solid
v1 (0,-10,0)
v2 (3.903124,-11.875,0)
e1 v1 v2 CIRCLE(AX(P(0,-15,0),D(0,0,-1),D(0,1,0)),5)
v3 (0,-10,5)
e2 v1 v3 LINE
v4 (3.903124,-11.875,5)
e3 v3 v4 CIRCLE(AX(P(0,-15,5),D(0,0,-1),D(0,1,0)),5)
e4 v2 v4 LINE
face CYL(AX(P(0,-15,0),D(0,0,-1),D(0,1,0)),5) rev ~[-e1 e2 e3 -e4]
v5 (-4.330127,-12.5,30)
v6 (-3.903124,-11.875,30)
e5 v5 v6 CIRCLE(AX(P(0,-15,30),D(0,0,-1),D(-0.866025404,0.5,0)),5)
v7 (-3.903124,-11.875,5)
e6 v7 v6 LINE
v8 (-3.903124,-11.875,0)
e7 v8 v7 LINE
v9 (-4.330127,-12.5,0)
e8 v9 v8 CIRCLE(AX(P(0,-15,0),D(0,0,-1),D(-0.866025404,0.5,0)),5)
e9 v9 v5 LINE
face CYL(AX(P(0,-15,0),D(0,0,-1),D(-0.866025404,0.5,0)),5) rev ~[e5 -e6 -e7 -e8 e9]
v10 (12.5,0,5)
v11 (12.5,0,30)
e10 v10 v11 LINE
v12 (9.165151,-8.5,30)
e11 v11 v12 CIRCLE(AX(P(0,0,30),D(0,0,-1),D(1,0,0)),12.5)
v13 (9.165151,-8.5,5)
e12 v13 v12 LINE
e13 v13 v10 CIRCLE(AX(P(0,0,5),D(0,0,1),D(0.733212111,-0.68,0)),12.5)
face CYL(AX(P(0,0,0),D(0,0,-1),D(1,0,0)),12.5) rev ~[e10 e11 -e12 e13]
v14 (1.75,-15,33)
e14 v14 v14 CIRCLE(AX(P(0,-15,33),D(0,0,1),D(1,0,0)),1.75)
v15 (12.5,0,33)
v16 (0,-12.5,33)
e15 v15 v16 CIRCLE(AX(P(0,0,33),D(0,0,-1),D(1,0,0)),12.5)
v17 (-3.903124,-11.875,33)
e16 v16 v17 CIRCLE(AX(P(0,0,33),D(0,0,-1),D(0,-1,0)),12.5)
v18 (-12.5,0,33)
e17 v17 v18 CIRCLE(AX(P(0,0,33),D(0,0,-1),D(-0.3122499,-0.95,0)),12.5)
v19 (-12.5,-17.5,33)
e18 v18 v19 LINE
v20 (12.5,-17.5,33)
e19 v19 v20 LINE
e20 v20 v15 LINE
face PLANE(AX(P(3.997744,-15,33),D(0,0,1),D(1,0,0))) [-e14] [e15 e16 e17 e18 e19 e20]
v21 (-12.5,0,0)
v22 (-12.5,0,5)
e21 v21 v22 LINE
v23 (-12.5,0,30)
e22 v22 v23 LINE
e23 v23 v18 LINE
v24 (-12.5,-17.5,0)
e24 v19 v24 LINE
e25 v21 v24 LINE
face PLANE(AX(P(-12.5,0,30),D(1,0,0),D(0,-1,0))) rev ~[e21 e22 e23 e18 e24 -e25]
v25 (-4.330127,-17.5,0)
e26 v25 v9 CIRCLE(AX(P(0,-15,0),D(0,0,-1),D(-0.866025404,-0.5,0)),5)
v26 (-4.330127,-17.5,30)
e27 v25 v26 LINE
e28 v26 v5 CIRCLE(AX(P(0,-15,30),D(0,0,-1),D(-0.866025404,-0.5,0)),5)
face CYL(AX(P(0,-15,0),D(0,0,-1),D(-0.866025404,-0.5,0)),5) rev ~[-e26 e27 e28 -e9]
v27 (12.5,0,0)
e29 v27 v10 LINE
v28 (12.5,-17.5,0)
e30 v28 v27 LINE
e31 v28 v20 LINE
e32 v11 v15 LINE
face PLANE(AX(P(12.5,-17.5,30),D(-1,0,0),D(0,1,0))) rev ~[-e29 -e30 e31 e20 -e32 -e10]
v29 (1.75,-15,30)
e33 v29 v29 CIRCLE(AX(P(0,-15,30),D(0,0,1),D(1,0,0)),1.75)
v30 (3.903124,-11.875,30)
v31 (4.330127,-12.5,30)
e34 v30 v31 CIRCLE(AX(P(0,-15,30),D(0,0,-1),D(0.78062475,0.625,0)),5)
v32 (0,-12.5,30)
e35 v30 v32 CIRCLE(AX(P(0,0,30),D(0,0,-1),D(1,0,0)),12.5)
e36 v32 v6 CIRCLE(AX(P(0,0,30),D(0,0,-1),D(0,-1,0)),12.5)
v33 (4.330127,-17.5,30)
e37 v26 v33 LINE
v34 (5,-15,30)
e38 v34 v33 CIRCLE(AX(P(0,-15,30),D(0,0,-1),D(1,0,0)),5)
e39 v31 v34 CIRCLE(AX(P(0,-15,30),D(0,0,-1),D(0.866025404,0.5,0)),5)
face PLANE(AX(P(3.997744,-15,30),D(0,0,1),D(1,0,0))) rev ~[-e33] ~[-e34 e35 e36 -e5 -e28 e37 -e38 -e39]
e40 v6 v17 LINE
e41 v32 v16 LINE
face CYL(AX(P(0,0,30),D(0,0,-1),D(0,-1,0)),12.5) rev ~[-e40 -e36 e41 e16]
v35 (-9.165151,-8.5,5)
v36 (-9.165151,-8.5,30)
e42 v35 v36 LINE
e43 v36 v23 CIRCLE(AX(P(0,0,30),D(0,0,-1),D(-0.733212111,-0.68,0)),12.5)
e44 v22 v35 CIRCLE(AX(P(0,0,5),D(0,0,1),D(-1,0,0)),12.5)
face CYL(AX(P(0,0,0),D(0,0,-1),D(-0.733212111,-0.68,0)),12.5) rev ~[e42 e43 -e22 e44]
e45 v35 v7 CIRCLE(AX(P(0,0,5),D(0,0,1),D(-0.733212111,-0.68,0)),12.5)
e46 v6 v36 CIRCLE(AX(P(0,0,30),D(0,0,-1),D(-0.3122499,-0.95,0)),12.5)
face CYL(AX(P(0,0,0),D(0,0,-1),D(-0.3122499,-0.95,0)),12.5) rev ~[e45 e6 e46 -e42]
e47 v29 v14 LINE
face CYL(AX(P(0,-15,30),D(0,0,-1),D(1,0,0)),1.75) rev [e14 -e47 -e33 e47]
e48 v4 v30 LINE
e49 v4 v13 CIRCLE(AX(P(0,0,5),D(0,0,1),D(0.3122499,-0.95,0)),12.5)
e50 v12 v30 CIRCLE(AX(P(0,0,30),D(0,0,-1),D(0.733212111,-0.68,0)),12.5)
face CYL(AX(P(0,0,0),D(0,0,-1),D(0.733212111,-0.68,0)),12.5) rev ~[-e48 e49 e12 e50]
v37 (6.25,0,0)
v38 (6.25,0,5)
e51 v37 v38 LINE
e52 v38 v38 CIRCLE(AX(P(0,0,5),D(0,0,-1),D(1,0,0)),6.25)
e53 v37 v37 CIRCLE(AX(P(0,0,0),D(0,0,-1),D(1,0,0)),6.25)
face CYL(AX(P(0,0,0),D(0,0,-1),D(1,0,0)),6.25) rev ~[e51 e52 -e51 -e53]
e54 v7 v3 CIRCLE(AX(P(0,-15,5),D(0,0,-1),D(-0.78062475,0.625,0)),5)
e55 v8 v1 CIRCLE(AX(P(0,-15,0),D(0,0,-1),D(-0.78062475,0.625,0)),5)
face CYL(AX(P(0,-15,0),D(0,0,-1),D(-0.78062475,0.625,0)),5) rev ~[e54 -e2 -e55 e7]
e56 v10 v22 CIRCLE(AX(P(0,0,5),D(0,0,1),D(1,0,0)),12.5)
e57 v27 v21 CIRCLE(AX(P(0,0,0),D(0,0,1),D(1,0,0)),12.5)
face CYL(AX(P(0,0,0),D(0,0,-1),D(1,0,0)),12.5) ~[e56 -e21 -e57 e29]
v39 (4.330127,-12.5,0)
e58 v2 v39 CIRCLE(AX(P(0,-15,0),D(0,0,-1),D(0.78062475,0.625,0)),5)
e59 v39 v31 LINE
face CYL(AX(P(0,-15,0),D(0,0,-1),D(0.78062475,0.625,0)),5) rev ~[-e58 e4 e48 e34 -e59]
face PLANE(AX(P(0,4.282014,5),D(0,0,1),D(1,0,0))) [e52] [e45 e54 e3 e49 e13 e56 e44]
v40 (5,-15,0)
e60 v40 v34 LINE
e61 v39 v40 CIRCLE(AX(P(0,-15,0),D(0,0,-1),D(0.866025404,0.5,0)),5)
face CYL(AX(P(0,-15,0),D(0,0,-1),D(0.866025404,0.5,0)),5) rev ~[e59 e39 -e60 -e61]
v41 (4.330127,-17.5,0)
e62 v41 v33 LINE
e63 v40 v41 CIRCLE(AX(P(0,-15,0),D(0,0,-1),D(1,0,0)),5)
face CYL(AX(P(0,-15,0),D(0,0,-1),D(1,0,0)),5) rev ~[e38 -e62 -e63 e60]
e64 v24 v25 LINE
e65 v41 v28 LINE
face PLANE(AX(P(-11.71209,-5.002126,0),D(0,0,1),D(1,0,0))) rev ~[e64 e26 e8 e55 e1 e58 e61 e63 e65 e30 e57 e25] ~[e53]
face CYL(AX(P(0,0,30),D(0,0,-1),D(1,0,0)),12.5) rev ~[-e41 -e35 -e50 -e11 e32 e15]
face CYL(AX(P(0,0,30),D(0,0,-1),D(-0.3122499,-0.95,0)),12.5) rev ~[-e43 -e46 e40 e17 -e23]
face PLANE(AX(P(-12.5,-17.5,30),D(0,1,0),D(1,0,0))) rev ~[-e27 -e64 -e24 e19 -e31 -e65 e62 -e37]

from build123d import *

# Parameters (mm, degrees)
F1_DEPTH = 5
F2_DEPTH = 30
F3_R     = 1.75
F4_DEPTH = 3


with BuildPart() as f1:
    # F0 (on Top) → F1 (new body)
    with BuildSketch(Plane.XY):
        with BuildLine():
            Line((6.25, 0), (10, 0))
            ThreePointArc((10, 0), (0, 10), (-10, 0))
            Line((-10, 0), (-6.25, 0))
            ThreePointArc((-6.25, 0), (0, 6.25), (6.25, 0))
        make_face()
        with BuildLine():
            Line((12.5, 0), (10, 0))
            ThreePointArc((10, 0), (8.7372269275, -4.8642435813), (5.2678268764, -8.5))
            Line((5.2678268764, -8.5), (9.1651513899, -8.5))
            ThreePointArc((9.1651513899, -8.5), (11.6364597789, -4.5653919671), (12.5, 0))
        make_face()
        with BuildLine():
            ThreePointArc((5.2678268764, -8.5), (8.7372269275, -4.8642435813), (10, 0))
            Line((10, 0), (6.25, 0))
            ThreePointArc((6.25, 0), (0, -6.25), (-6.25, 0))
            Line((-6.25, 0), (-10, 0))
            ThreePointArc((-10, 0), (-8.7372269275, -4.8642435813), (-5.2678268764, -8.5))
            Line((-5.2678268764, -8.5), (5.2678268764, -8.5))
        make_face()
        with BuildLine():
            ThreePointArc((-10, 0), (0, 10), (10, 0))
            Line((10, 0), (12.5, 0))
            ThreePointArc((12.5, 0), (0, 12.5), (-12.5, 0))
            Line((-12.5, 0), (-10, 0))
        make_face()
        with BuildLine():
            ThreePointArc((-5.2678268764, -8.5), (-8.7372269275, -4.8642435813), (-10, 0))
            Line((-10, 0), (-12.5, 0))
            ThreePointArc((-12.5, 0), (-11.6364597789, -4.5653919671), (-9.1651513899, -8.5))
            Line((-9.1651513899, -8.5), (-5.2678268764, -8.5))
        make_face()
        with BuildLine():
            Line((9.1651513899, -8.5), (5.2678268764, -8.5))
            ThreePointArc((5.2678268764, -8.5), (2.7386127875, -9.6176920308), (0, -10))
            ThreePointArc((0, -10), (2.1650635095, -10.4930609057), (3.903123749, -11.875))
            ThreePointArc((3.903123749, -11.875), (6.7485265078, -10.5217579317), (9.1651513899, -8.5))
        make_face()
        with BuildLine():
            ThreePointArc((0, -10), (2.7386127875, -9.6176920308), (5.2678268764, -8.5))
            Line((5.2678268764, -8.5), (-5.2678268764, -8.5))
            ThreePointArc((-5.2678268764, -8.5), (-2.7386127875, -9.6176920308), (0, -10))
        make_face()
        with BuildLine():
            ThreePointArc((0, -10), (-2.7386127875, -9.6176920308), (-5.2678268764, -8.5))
            Line((-5.2678268764, -8.5), (-9.1651513899, -8.5))
            ThreePointArc((-9.1651513899, -8.5), (-6.7485265078, -10.5217579317), (-3.903123749, -11.875))
            ThreePointArc((-3.903123749, -11.875), (-2.1650635095, -10.4930609057), (0, -10))
        make_face()
    extrude(amount=F1_DEPTH)

    # F0 (on Top) → F2 (join)
    with BuildSketch(Plane.XY):
        with BuildLine():
            ThreePointArc((-9.1651513899, -8.5), (-11.6364597789, -4.5653919671), (-12.5, 0))
            Line((-12.5, 0), (-12.5, -8.5))
            Line((-12.5, -8.5), (-9.1651513899, -8.5))
        make_face()
        with BuildLine():
            Line((12.5, -8.5), (12.5, 0))
            ThreePointArc((12.5, 0), (11.6364597789, -4.5653919671), (9.1651513899, -8.5))
            Line((9.1651513899, -8.5), (12.5, -8.5))
        make_face()
        with BuildLine():
            Line((12.5, -8.5), (9.1651513899, -8.5))
            ThreePointArc((9.1651513899, -8.5), (6.7485265078, -10.5217579317), (3.903123749, -11.875))
            ThreePointArc((3.903123749, -11.875), (4.1284695472, -12.1794080057), (4.3301270189, -12.5))
            Line((4.3301270189, -12.5), (12.5, -12.5))
            Line((12.5, -12.5), (12.5, -8.5))
        make_face()
        with BuildLine():
            ThreePointArc((-3.903123749, -11.875), (-6.7485265078, -10.5217579317), (-9.1651513899, -8.5))
            Line((-9.1651513899, -8.5), (-12.5, -8.5))
            Line((-12.5, -8.5), (-12.5, -12.5))
            Line((-12.5, -12.5), (-4.3301270189, -12.5))
            ThreePointArc((-4.3301270189, -12.5), (-4.1284695472, -12.1794080057), (-3.903123749, -11.875))
        make_face()
        with BuildLine():
            Line((-4.3301270189, -12.5), (-12.5, -12.5))
            Line((-12.5, -12.5), (-12.5, -17.5))
            Line((-12.5, -17.5), (-4.3301270189, -17.5))
            ThreePointArc((-4.3301270189, -17.5), (-5, -15), (-4.3301270189, -12.5))
        make_face()
        with BuildLine():
            Line((12.5, -17.5), (12.5, -12.5))
            Line((12.5, -12.5), (4.3301270189, -12.5))
            ThreePointArc((4.3301270189, -12.5), (4.8296291314, -13.7059047745), (5, -15))
            ThreePointArc((5, -15), (4.8296291314, -16.2940952255), (4.3301270189, -17.5))
            Line((4.3301270189, -17.5), (12.5, -17.5))
        make_face()
    extrude(amount=F2_DEPTH)

    # F3 (on face) → F4 (join)
    with BuildSketch(Plane.XY.offset(30)):
        with BuildLine():
            Line((0, -12.5), (-4.3301270189, -12.5))
            ThreePointArc((-4.3301270189, -12.5), (-5, -15), (-4.3301270189, -17.5))
            Line((-4.3301270189, -17.5), (12.5, -17.5))
            Line((12.5, -17.5), (12.5, -12.5))
            Line((12.5, -12.5), (0, -12.5))
        make_face()
        with Locations((0, -15)):
            Circle(F3_R, mode=Mode.SUBTRACT)
        with BuildLine():
            ThreePointArc((-3.903123749, -11.875), (-10.1251925133, -7.3301075414), (-12.5, 0))
            Line((-12.5, 0), (-12.5, -12.5))
            Line((-12.5, -12.5), (-4.3301270189, -12.5))
            ThreePointArc((-4.3301270189, -12.5), (-4.1284695472, -12.1794080057), (-3.903123749, -11.875))
        make_face()
        with BuildLine():
            Line((-4.3301270189, -12.5), (-12.5, -12.5))
            Line((-12.5, -12.5), (-12.5, -17.5))
            Line((-12.5, -17.5), (-4.3301270189, -17.5))
            ThreePointArc((-4.3301270189, -17.5), (-5, -15), (-4.3301270189, -12.5))
        make_face()
        with BuildLine():
            Line((12.5, -12.5), (12.5, 0))
            ThreePointArc((12.5, 0), (8.8388347648, -8.8388347648), (0, -12.5))
            Line((0, -12.5), (12.5, -12.5))
        make_face()
        with BuildLine():
            ThreePointArc((0, -12.5), (-1.9764235376, -12.3427610363), (-3.903123749, -11.875))
            ThreePointArc((-3.903123749, -11.875), (-4.1284695472, -12.1794080057), (-4.3301270189, -12.5))
            Line((-4.3301270189, -12.5), (0, -12.5))
        make_face()
    extrude(amount=F4_DEPTH)


solid = f1.part
